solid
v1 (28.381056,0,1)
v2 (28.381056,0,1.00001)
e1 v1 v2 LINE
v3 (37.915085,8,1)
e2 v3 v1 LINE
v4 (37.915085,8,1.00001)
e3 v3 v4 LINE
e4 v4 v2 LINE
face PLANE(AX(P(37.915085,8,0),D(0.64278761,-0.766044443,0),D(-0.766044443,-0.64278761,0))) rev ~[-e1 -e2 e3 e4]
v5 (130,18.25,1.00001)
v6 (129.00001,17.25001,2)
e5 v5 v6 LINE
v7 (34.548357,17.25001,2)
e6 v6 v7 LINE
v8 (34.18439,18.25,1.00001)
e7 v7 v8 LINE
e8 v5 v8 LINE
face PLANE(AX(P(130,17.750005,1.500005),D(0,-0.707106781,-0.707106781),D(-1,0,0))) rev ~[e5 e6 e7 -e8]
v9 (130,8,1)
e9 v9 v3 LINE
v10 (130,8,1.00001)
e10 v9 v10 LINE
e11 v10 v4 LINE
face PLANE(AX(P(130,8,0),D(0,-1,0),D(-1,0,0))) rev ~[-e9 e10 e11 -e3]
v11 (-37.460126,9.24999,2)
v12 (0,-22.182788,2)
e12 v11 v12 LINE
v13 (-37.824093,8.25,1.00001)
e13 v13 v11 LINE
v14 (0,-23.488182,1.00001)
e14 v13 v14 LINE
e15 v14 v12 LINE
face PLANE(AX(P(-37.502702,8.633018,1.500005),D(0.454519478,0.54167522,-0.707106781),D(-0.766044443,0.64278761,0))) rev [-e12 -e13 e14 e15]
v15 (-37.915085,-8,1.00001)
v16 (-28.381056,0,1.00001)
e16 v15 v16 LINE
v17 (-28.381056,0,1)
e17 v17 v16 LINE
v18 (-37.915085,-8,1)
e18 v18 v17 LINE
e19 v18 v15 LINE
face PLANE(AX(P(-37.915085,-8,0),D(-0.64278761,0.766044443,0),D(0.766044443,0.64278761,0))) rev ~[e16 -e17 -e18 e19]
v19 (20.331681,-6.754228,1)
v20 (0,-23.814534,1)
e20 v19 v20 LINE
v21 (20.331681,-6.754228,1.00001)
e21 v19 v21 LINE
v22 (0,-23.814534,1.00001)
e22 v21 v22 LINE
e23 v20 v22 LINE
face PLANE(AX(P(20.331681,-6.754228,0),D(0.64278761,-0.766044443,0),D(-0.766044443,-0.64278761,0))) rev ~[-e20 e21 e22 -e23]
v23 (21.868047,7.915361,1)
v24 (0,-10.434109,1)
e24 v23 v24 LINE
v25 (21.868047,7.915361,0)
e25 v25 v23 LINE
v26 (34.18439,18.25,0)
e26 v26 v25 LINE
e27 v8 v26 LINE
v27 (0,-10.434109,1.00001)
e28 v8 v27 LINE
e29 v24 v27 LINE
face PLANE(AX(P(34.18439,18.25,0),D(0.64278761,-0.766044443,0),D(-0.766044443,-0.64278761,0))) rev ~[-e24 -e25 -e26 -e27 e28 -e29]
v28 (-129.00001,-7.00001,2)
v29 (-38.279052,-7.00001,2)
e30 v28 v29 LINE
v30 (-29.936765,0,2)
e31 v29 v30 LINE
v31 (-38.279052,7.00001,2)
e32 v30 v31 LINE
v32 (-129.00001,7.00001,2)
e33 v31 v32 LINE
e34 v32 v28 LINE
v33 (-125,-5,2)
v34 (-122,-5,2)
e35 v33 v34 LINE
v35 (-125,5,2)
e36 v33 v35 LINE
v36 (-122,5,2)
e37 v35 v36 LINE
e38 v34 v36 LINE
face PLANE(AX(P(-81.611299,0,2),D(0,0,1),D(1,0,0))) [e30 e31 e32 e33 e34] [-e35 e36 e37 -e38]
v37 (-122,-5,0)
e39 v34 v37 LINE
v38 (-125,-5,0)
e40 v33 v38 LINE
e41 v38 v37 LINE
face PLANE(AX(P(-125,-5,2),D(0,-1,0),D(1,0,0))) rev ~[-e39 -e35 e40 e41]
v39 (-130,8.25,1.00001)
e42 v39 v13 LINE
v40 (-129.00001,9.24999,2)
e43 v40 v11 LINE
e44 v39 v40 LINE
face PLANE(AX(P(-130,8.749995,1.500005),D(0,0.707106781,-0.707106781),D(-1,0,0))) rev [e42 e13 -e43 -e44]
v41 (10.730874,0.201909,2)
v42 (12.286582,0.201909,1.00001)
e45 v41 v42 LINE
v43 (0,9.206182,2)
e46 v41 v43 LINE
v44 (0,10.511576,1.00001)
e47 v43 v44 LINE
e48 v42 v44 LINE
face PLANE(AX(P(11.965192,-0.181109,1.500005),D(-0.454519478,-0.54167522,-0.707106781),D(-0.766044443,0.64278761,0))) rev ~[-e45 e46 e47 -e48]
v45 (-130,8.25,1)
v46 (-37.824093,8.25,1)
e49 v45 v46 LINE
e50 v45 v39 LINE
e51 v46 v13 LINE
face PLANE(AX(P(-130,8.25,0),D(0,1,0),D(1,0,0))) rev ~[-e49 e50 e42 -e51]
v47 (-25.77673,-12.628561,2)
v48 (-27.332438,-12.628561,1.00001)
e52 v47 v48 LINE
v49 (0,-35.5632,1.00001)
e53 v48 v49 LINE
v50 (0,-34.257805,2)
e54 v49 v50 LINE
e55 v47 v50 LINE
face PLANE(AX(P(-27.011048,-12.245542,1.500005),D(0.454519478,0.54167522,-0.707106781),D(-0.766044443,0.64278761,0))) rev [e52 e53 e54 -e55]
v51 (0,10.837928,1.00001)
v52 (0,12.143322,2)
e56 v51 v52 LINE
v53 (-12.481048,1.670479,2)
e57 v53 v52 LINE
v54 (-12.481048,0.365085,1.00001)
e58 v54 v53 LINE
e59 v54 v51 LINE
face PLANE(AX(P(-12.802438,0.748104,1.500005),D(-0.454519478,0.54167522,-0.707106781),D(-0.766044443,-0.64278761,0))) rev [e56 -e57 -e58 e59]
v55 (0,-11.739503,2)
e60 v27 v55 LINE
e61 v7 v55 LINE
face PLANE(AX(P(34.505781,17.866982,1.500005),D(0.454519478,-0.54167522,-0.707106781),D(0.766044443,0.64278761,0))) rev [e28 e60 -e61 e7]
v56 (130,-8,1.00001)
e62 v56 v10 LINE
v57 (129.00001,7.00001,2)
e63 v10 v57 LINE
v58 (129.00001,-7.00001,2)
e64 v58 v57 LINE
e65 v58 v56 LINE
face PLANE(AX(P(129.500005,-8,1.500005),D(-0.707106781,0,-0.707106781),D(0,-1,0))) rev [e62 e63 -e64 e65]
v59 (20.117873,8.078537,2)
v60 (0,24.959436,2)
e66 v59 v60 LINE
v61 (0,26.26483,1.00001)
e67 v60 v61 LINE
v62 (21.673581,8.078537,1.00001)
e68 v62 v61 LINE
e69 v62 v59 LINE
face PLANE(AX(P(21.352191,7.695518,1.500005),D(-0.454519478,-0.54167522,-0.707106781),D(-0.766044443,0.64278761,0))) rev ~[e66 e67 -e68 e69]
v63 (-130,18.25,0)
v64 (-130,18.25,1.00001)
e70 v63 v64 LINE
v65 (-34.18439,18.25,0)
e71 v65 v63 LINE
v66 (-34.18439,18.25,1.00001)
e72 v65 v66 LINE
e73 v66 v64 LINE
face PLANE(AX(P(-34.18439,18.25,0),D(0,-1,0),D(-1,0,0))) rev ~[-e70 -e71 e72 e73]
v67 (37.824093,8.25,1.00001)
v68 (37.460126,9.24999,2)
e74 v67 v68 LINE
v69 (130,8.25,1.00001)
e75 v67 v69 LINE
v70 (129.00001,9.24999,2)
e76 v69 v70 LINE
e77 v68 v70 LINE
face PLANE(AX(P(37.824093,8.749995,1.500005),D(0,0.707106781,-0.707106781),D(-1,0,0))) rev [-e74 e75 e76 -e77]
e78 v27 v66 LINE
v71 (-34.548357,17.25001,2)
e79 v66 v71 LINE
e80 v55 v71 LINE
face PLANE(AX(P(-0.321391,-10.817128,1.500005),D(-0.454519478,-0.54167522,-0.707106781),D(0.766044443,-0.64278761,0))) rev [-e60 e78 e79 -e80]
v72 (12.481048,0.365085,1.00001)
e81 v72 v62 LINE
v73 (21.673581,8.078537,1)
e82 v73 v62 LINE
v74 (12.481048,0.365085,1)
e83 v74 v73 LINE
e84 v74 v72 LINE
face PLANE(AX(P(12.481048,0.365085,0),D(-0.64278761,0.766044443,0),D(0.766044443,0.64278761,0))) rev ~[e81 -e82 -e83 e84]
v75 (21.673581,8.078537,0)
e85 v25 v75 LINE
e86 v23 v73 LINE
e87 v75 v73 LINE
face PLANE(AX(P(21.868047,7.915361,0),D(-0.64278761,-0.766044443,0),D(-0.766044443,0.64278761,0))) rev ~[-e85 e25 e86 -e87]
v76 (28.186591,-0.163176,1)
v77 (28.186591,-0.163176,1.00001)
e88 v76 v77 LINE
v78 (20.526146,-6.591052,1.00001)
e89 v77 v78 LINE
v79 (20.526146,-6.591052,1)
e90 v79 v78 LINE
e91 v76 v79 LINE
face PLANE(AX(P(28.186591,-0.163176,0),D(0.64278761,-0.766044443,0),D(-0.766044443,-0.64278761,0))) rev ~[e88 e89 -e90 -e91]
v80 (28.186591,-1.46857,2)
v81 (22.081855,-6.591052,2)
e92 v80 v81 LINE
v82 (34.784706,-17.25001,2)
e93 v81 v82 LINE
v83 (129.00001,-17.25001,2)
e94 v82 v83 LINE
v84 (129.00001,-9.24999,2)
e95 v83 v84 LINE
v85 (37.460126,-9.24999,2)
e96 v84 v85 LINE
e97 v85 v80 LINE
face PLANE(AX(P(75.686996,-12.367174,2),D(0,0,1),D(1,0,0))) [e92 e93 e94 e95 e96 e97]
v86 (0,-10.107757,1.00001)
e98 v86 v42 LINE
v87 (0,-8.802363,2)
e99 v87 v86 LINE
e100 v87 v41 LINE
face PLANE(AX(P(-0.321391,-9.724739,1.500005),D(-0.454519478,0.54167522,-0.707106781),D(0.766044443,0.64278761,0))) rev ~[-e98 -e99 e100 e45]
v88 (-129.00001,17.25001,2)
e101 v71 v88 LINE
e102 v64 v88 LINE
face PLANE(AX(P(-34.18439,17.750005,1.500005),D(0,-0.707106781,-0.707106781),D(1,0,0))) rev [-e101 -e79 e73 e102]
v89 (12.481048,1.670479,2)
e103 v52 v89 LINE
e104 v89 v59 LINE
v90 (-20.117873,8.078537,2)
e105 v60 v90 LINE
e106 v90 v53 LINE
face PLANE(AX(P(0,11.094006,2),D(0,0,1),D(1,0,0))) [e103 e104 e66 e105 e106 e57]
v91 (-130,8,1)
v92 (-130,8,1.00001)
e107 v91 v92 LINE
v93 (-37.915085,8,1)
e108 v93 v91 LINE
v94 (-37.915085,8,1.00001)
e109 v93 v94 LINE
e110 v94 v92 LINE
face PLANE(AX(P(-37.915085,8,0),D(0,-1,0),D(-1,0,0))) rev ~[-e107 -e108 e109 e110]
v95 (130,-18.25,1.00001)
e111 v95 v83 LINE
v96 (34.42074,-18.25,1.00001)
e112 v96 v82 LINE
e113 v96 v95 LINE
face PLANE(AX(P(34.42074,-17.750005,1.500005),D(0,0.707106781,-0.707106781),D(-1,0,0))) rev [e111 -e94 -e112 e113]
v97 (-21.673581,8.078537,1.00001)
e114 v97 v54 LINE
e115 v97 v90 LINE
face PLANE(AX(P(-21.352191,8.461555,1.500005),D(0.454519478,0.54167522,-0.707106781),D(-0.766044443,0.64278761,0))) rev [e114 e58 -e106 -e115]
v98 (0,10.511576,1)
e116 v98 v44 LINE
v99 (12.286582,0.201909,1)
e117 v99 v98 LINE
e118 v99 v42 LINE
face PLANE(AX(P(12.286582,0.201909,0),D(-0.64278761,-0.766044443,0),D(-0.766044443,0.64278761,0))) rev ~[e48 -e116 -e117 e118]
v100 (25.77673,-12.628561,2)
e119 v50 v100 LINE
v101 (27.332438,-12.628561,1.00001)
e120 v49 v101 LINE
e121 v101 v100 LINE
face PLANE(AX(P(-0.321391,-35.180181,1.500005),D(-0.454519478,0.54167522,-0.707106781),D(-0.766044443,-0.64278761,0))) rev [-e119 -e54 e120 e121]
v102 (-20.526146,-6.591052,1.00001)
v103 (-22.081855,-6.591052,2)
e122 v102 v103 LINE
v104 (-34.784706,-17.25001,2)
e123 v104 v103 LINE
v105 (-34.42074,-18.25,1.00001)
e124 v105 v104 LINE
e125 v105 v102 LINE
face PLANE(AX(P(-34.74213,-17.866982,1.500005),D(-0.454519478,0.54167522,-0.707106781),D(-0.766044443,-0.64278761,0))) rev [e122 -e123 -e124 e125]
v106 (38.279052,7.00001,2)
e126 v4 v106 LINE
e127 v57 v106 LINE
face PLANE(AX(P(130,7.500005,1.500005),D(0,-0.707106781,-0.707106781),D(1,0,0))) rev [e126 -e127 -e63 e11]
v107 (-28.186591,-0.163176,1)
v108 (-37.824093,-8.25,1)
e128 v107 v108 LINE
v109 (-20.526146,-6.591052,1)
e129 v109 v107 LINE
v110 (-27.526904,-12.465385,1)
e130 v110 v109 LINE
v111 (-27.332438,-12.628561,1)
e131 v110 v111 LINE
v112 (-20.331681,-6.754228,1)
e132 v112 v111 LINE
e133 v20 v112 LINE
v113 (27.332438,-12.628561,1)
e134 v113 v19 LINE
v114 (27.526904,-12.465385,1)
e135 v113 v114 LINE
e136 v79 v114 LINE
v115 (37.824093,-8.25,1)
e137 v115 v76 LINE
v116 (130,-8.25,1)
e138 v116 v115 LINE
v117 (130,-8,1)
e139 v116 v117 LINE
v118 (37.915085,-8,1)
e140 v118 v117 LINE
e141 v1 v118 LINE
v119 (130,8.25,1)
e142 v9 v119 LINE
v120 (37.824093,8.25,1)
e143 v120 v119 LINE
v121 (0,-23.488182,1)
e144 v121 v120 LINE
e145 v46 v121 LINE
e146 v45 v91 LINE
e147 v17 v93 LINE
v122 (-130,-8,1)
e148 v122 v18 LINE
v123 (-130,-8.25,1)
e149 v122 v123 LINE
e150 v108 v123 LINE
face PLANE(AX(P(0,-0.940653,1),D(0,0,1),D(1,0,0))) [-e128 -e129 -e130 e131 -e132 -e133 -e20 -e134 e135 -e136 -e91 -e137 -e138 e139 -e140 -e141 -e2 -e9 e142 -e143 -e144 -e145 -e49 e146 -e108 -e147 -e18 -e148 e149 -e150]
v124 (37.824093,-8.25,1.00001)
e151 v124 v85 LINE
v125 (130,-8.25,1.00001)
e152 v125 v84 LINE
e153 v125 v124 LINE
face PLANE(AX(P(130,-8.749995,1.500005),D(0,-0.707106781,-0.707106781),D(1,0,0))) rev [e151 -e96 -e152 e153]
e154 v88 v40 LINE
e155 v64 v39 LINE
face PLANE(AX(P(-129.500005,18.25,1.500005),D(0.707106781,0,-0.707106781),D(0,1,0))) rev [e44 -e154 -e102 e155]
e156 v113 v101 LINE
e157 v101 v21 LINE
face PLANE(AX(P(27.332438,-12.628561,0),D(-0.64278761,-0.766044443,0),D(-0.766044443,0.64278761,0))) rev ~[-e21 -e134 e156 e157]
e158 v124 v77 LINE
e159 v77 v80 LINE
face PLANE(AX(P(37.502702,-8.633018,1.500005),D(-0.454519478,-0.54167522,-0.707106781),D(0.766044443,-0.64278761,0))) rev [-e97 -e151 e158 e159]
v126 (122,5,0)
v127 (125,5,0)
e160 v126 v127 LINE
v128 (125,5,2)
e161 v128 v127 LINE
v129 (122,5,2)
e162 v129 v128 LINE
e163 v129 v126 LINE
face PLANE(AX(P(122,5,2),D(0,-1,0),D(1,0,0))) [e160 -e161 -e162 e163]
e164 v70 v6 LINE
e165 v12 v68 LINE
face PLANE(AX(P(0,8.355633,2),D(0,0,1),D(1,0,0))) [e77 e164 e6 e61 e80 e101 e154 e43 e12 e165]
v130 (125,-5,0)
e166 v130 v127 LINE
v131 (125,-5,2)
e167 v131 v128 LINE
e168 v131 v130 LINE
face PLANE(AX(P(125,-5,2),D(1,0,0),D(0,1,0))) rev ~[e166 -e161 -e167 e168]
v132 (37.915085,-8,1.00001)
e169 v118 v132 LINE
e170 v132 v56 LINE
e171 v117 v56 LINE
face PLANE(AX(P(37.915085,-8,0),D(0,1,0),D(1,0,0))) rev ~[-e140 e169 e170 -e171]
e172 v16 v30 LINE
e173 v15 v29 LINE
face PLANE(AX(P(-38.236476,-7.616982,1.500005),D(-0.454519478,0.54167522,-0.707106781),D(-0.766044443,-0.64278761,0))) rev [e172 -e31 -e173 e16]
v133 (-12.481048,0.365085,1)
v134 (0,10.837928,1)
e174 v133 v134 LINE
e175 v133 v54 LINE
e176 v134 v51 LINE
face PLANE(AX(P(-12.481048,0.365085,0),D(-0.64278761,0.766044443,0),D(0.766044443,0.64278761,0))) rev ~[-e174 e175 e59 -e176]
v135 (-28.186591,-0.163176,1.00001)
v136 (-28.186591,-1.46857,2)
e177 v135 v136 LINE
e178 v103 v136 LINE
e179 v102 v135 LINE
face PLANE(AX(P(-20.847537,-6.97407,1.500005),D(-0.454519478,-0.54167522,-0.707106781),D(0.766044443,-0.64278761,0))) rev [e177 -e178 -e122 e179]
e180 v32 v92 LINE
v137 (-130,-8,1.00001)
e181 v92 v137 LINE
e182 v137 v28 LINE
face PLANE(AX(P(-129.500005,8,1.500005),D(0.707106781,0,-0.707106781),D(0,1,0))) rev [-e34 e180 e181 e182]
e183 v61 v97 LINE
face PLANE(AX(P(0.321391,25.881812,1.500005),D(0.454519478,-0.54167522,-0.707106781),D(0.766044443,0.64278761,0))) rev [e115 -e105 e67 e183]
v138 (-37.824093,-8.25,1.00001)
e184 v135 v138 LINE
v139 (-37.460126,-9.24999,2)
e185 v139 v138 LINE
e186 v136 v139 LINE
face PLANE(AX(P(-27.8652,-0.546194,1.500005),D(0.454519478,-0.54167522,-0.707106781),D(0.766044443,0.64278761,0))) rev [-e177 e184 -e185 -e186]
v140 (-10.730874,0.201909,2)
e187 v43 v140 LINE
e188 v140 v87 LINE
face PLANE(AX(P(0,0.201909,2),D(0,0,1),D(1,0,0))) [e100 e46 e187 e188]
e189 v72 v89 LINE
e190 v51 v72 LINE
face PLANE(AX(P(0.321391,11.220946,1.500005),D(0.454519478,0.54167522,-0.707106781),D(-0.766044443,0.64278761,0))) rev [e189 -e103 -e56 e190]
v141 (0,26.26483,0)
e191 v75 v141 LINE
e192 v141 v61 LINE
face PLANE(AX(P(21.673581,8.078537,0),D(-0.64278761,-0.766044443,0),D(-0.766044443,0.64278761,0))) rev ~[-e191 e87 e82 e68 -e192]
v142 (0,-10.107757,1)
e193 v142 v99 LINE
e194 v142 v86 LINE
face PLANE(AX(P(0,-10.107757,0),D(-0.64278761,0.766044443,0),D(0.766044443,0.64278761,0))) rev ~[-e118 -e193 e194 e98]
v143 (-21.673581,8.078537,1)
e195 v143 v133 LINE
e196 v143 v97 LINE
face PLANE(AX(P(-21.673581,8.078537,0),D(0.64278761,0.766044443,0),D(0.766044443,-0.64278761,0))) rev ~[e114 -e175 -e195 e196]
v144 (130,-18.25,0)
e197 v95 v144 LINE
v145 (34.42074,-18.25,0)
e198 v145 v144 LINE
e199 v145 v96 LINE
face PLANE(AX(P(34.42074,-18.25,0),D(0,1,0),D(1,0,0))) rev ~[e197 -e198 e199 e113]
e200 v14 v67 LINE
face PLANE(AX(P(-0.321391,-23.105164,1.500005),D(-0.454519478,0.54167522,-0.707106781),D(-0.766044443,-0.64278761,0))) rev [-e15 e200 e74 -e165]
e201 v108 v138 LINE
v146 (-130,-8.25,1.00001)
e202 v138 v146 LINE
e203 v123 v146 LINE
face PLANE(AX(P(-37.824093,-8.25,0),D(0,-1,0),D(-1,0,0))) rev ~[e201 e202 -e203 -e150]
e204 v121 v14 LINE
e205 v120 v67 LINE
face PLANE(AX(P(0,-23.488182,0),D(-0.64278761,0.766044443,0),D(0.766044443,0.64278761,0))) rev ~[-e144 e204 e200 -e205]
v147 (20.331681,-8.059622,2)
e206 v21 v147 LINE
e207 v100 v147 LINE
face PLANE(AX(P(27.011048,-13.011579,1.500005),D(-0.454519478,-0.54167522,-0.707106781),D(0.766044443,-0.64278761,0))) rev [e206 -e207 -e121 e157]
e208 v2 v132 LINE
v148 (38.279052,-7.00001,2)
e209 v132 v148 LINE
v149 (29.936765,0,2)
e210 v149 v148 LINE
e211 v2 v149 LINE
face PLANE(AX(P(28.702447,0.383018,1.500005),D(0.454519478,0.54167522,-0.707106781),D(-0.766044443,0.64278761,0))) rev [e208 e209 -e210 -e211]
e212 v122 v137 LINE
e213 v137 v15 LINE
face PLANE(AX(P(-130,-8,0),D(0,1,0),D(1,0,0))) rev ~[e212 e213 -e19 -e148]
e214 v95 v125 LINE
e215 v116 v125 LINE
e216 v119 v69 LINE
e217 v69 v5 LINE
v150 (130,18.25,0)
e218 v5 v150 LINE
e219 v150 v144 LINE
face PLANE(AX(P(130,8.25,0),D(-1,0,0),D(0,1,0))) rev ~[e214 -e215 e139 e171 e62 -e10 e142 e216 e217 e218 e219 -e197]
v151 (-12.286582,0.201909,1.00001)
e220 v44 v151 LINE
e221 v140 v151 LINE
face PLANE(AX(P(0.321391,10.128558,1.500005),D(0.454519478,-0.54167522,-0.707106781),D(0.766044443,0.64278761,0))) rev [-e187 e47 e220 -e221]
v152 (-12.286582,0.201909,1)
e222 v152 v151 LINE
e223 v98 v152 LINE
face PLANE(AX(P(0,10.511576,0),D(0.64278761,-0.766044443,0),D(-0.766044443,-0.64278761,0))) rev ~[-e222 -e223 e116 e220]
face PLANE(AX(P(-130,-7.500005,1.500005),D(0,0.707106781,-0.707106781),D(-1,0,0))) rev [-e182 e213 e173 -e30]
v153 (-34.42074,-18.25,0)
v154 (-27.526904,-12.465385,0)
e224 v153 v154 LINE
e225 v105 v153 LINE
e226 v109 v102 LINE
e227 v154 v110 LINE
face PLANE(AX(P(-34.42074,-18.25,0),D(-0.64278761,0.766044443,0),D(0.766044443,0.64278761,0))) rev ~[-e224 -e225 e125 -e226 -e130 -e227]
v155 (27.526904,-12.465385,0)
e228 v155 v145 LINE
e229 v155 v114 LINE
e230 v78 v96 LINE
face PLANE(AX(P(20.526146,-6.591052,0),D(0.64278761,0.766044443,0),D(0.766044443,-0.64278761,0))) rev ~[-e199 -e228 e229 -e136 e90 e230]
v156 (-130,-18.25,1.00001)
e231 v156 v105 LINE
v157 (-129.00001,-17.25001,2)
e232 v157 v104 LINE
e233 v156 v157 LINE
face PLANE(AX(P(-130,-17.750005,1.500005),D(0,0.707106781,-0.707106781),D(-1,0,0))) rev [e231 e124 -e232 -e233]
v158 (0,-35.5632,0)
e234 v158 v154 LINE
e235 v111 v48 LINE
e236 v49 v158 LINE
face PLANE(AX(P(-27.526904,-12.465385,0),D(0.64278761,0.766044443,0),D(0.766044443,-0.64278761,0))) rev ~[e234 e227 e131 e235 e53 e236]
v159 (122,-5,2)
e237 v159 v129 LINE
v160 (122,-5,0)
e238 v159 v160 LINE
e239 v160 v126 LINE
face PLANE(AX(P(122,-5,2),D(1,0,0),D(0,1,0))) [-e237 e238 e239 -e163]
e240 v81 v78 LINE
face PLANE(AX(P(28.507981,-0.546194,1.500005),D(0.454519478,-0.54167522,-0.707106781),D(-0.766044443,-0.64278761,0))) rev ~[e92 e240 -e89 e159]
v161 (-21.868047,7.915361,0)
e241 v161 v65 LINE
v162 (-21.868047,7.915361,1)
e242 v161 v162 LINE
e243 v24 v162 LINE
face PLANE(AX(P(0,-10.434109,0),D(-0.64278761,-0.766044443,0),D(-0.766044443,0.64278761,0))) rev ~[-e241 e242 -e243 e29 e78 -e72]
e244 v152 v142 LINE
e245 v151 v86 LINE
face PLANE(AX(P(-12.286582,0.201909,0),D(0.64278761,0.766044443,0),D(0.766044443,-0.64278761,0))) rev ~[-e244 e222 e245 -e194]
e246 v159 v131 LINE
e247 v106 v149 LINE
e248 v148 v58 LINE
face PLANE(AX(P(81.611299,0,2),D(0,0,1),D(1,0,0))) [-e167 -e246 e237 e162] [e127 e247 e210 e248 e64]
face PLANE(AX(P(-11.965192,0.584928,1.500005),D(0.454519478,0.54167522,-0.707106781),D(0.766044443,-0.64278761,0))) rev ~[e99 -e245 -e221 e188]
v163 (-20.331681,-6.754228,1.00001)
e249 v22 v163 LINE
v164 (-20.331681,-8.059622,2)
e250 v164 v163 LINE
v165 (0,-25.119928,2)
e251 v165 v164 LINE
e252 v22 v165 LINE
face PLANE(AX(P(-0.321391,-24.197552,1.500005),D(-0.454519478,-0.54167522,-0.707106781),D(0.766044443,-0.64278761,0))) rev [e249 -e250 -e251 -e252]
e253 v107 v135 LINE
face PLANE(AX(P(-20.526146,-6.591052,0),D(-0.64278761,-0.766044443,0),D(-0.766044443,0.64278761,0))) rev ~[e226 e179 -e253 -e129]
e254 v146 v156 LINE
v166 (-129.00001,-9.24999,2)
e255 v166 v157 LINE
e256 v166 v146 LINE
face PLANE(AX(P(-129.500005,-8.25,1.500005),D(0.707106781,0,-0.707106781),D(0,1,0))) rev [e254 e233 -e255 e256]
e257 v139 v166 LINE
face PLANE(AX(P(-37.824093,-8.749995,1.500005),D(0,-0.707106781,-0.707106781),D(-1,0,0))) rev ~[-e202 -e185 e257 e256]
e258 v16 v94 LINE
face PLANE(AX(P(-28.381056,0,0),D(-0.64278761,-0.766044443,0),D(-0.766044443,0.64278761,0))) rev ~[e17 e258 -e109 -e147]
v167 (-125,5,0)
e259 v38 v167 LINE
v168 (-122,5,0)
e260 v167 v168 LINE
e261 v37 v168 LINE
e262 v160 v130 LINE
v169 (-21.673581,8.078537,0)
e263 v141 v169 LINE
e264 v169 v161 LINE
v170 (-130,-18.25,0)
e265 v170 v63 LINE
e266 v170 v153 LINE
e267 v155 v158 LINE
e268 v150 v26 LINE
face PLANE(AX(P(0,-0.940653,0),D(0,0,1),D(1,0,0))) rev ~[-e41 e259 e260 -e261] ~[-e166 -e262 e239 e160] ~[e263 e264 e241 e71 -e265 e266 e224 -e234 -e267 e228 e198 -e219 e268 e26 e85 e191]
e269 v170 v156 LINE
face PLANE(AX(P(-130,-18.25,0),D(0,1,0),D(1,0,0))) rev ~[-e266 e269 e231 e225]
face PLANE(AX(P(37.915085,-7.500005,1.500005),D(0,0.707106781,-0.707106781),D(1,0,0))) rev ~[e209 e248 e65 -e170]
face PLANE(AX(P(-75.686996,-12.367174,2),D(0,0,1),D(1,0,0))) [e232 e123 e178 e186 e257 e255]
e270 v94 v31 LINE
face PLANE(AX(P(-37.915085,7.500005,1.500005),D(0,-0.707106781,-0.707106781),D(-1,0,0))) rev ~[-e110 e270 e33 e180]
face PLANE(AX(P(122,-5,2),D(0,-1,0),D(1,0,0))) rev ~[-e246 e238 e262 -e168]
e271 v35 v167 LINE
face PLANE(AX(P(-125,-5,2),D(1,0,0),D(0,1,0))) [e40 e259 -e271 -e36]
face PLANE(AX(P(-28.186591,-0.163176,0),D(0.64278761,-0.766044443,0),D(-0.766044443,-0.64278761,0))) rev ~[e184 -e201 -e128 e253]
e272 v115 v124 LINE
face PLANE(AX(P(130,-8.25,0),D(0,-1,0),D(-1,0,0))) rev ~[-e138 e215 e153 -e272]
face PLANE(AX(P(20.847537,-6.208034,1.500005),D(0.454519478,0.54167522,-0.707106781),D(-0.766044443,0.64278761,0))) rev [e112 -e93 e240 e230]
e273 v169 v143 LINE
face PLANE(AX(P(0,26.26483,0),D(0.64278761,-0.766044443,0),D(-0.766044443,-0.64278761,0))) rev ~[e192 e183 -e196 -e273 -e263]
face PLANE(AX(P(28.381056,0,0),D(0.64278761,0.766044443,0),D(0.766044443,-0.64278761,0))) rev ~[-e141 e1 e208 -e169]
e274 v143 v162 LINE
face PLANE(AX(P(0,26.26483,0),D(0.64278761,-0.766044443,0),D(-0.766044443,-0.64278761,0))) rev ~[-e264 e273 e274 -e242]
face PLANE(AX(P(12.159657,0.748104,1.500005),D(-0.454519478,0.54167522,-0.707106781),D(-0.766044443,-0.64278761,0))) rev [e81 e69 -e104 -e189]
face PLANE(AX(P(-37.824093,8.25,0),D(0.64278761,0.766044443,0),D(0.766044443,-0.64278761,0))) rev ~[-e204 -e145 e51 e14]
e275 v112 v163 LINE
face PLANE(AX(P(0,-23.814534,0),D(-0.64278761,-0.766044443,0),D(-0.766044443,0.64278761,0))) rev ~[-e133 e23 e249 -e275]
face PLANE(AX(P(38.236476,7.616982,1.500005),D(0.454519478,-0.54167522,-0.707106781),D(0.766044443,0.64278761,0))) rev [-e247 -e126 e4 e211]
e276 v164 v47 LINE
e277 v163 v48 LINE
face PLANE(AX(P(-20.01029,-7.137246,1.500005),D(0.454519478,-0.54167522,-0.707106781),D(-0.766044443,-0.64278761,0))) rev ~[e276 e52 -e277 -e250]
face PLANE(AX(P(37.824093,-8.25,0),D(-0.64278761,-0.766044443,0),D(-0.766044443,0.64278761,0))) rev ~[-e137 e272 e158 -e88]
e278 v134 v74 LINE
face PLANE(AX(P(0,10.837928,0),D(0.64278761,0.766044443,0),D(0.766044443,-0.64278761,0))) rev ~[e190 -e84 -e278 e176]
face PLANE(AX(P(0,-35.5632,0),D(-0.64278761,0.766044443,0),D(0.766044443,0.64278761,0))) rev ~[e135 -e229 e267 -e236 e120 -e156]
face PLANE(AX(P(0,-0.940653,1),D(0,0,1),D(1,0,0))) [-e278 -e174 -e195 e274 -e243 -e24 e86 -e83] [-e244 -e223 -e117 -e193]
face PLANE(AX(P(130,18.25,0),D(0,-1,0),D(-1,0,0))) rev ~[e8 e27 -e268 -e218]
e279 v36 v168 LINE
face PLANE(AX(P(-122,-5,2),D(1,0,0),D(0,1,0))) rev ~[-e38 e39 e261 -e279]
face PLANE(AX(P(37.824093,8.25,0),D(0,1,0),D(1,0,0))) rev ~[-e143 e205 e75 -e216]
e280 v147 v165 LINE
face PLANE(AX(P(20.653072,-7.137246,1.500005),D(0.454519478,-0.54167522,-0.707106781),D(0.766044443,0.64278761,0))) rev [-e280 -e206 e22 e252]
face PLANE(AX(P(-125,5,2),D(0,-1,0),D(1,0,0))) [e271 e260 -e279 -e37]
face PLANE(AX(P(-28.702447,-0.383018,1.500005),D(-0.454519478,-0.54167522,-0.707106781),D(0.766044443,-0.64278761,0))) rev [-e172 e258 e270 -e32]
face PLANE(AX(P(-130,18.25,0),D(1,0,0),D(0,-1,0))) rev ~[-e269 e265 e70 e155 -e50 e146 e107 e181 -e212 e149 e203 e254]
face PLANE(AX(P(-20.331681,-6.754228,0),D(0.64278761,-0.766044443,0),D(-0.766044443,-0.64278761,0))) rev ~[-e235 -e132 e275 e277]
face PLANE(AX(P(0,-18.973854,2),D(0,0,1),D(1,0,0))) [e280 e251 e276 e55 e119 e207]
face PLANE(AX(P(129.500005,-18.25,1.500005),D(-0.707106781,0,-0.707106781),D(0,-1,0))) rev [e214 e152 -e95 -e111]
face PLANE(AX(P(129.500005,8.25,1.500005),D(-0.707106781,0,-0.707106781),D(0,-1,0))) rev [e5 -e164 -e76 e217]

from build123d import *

# Parameters (mm, degrees)
F1_DEPTH  = 2
F3_DEPTH  = 2
F5_DEPTH  = 2
F7_DEPTH  = 2
F9_DEPTH  = 1
F10_SIZE  = 0.99999
F11_W     = 3
F11_H     = 10
F12_DEPTH = 2


# Not quite as in the source:
# - a fillet or chamfer is up to 0.001 mm smaller than in the source, because OpenCascade refuses the exact size


with BuildPart() as f1:
    # F0 (on Top) → F1 (new body)
    with BuildSketch(Plane.XY):
        Polygon((37.9150851114, 8), (28.3810563706, 0), (37.9150851114, -8), (130, -8), (130, 0), (130, 8), align=None)
    extrude(amount=F1_DEPTH)



with BuildPart() as f1b:
    # F0 (on Top) → F1, piece 2 (new body)
    with BuildSketch(Plane.XY):
        Polygon((-37.9150851114, -8), (-28.3810563706, 0), (-37.9150851114, 8), (-130, 8), (-130, 0), (-130, -8), align=None)
    extrude(amount=F1_DEPTH)


with BuildPart() as f3:
    # F2 (on Top) → F3 (new body)
    with BuildSketch(Plane.XY):
        Polygon((-37.8240925528, 8.25), (0, -23.4881821107), (37.8240925528, 8.25), (130, 8.25), (130, 18.25), (34.1843902102, 18.25), (0, -10.4341092174), (-34.1843902102, 18.25), (-130, 18.25), (-130, 8.25), align=None)
    extrude(amount=F3_DEPTH)


with BuildPart() as f5:
    # F4 (on Top) → F5 (new body)
    with BuildSketch(Plane.XY):
        Polygon((12.4810478052, 0.365085215), (21.6735811226, 8.0785365312), (0, 26.2648304575), (-21.6735811226, 8.0785365312), (-12.4810478052, 0.365085215), (0, 10.8379278251), align=None)
    extrude(amount=F5_DEPTH)


with BuildPart() as f5b:
    # F4 (on Top) → F5, piece 2 (new body)
    with BuildSketch(Plane.XY):
        Polygon((37.8240925528, -8.25), (28.1865908923, -0.1631759112), (20.5261464611, -6.591052008), (34.4207396164, -18.25), (130, -18.25), (130, -8.25), align=None)
    extrude(amount=F5_DEPTH)


with BuildPart() as f5c:
    # F4 (on Top) → F5, piece 3 (new body)
    with BuildSketch(Plane.XY):
        Polygon((-130, -18.25), (-34.4207396164, -18.25), (-20.5261464611, -6.591052008), (-28.1865908923, -0.1631759112), (-37.8240925528, -8.25), (-130, -8.25), align=None)
    extrude(amount=F5_DEPTH)


with BuildPart() as f7:
    # F6 (on Top) → F7 (new body)
    with BuildSketch(Plane.XY):
        Polygon((-27.3324382036, -12.6285607212), (0, -35.563199537), (27.3324382036, -12.6285607212), (20.3316809827, -6.7542279192), (0, -23.814533933), (-20.3316809827, -6.7542279192), align=None)
    extrude(amount=F7_DEPTH)


with BuildPart() as f7b:
    # F6 (on Top) → F7, piece 2 (new body)
    with BuildSketch(Plane.XY):
        Polygon((-12.2865823268, 0.2019093038), (0, -10.107757395), (12.2865823268, 0.2019093038), (0, 10.5115760027), align=None)
    extrude(amount=F7_DEPTH)


with BuildPart() as f1_1:
    add(f1.part)

    add(f1b.part)  # F9 merges F1b

    add(f3.part)  # F9 merges F3

    add(f5.part)  # F9 merges F5

    add(f5b.part)  # F9 merges F5b

    add(f5c.part)  # F9 merges F5c

    add(f7.part)  # F9 merges F7

    add(f7b.part)  # F9 merges F7b
    # F8 (on Top) → F9 (join)
    with BuildSketch(Plane.XY):
        Polygon((21.868046601, 7.9153606201), (0, 26.2648304575), (-21.868046601, 7.9153606201), (-34.1843902102, 18.25), (-130, 18.25), (-130, -18.25), (-34.4207396164, -18.25), (-27.526903682, -12.46538481), (0, -35.563199537), (27.526903682, -12.46538481), (34.4207396164, -18.25), (130, -18.25), (130, 18.25), (34.1843902102, 18.25), align=None)
    extrude(amount=F9_DEPTH)

    # F10 (size 1 in the source; OpenCascade refuses exactly that, so slightly less here)
    f10_edges = [f1_1.edges().sort_by_distance(p)[0] for p in [
        (-18.912046, -7.619091, 2),
        (18.912046, -7.619091, 2),
        (83.912046, 8.25, 2),
        (130, 13.25, 2),
        (82.092195, 18.25, 2),
        (17.092195, 3.907945, 2),
        (-17.092195, 3.907945, 2),
        (-82.092195, 18.25, 2),
        (-130, 13.25, 2),
        (-83.912046, 8.25, 2),
        (-33.148071, -4, 2),
        (-33.148071, 4, 2),
        (-83.957543, 8, 2),
        (-130, 0, 2),
        (-83.957543, -8, 2),
        (-83.912046, -8.25, 2),
        (-130, -13.25, 2),
        (-82.21037, -18.25, 2),
        (-27.473443, -12.420526, 2),
        (-24.356369, -3.377114, 2),
        (-33.005342, -4.206588, 2),
        (6.240524, 5.601507, 2),
        (17.077314, 4.221811, 2),
        (10.836791, 17.171683, 2),
        (-10.836791, 17.171683, 2),
        (-17.077314, 4.221811, 2),
        (-6.240524, 5.601507, 2),
        (-6.143291, -4.952924, 2),
        (6.143291, -4.952924, 2),
        (6.143291, 5.356743, 2),
        (-6.143291, 5.356743, 2),
        (-23.83206, -9.691394, 2),
        (-13.666219, -24.09588, 2),
        (13.666219, -24.09588, 2),
        (23.83206, -9.691394, 2),
        (10.16584, -15.284381, 2),
        (-10.16584, -15.284381, 2),
        (33.005342, -4.206588, 2),
        (24.356369, -3.377114, 2),
        (27.473443, -12.420526, 2),
        (82.21037, -18.25, 2),
        (130, -13.25, 2),
        (83.912046, -8.25, 2),
        (33.148071, 4, 2),
        (33.148071, -4, 2),
        (83.957543, -8, 2),
        (130, 0, 2),
        (83.957543, 8, 2),
    ]]
    chamfer(f10_edges, length=F10_SIZE)

    # F11 (on face) → F12 (cut, through all)
    with BuildSketch(Plane.XY.offset(2)):
        with Locations((123.5, 0)):
            Rectangle(F11_W, F11_H)
        with Locations((-123.5, 0)):
            Rectangle(F11_W, F11_H)
    extrude(amount=-F12_DEPTH, mode=Mode.SUBTRACT)


solid = f1_1.part
